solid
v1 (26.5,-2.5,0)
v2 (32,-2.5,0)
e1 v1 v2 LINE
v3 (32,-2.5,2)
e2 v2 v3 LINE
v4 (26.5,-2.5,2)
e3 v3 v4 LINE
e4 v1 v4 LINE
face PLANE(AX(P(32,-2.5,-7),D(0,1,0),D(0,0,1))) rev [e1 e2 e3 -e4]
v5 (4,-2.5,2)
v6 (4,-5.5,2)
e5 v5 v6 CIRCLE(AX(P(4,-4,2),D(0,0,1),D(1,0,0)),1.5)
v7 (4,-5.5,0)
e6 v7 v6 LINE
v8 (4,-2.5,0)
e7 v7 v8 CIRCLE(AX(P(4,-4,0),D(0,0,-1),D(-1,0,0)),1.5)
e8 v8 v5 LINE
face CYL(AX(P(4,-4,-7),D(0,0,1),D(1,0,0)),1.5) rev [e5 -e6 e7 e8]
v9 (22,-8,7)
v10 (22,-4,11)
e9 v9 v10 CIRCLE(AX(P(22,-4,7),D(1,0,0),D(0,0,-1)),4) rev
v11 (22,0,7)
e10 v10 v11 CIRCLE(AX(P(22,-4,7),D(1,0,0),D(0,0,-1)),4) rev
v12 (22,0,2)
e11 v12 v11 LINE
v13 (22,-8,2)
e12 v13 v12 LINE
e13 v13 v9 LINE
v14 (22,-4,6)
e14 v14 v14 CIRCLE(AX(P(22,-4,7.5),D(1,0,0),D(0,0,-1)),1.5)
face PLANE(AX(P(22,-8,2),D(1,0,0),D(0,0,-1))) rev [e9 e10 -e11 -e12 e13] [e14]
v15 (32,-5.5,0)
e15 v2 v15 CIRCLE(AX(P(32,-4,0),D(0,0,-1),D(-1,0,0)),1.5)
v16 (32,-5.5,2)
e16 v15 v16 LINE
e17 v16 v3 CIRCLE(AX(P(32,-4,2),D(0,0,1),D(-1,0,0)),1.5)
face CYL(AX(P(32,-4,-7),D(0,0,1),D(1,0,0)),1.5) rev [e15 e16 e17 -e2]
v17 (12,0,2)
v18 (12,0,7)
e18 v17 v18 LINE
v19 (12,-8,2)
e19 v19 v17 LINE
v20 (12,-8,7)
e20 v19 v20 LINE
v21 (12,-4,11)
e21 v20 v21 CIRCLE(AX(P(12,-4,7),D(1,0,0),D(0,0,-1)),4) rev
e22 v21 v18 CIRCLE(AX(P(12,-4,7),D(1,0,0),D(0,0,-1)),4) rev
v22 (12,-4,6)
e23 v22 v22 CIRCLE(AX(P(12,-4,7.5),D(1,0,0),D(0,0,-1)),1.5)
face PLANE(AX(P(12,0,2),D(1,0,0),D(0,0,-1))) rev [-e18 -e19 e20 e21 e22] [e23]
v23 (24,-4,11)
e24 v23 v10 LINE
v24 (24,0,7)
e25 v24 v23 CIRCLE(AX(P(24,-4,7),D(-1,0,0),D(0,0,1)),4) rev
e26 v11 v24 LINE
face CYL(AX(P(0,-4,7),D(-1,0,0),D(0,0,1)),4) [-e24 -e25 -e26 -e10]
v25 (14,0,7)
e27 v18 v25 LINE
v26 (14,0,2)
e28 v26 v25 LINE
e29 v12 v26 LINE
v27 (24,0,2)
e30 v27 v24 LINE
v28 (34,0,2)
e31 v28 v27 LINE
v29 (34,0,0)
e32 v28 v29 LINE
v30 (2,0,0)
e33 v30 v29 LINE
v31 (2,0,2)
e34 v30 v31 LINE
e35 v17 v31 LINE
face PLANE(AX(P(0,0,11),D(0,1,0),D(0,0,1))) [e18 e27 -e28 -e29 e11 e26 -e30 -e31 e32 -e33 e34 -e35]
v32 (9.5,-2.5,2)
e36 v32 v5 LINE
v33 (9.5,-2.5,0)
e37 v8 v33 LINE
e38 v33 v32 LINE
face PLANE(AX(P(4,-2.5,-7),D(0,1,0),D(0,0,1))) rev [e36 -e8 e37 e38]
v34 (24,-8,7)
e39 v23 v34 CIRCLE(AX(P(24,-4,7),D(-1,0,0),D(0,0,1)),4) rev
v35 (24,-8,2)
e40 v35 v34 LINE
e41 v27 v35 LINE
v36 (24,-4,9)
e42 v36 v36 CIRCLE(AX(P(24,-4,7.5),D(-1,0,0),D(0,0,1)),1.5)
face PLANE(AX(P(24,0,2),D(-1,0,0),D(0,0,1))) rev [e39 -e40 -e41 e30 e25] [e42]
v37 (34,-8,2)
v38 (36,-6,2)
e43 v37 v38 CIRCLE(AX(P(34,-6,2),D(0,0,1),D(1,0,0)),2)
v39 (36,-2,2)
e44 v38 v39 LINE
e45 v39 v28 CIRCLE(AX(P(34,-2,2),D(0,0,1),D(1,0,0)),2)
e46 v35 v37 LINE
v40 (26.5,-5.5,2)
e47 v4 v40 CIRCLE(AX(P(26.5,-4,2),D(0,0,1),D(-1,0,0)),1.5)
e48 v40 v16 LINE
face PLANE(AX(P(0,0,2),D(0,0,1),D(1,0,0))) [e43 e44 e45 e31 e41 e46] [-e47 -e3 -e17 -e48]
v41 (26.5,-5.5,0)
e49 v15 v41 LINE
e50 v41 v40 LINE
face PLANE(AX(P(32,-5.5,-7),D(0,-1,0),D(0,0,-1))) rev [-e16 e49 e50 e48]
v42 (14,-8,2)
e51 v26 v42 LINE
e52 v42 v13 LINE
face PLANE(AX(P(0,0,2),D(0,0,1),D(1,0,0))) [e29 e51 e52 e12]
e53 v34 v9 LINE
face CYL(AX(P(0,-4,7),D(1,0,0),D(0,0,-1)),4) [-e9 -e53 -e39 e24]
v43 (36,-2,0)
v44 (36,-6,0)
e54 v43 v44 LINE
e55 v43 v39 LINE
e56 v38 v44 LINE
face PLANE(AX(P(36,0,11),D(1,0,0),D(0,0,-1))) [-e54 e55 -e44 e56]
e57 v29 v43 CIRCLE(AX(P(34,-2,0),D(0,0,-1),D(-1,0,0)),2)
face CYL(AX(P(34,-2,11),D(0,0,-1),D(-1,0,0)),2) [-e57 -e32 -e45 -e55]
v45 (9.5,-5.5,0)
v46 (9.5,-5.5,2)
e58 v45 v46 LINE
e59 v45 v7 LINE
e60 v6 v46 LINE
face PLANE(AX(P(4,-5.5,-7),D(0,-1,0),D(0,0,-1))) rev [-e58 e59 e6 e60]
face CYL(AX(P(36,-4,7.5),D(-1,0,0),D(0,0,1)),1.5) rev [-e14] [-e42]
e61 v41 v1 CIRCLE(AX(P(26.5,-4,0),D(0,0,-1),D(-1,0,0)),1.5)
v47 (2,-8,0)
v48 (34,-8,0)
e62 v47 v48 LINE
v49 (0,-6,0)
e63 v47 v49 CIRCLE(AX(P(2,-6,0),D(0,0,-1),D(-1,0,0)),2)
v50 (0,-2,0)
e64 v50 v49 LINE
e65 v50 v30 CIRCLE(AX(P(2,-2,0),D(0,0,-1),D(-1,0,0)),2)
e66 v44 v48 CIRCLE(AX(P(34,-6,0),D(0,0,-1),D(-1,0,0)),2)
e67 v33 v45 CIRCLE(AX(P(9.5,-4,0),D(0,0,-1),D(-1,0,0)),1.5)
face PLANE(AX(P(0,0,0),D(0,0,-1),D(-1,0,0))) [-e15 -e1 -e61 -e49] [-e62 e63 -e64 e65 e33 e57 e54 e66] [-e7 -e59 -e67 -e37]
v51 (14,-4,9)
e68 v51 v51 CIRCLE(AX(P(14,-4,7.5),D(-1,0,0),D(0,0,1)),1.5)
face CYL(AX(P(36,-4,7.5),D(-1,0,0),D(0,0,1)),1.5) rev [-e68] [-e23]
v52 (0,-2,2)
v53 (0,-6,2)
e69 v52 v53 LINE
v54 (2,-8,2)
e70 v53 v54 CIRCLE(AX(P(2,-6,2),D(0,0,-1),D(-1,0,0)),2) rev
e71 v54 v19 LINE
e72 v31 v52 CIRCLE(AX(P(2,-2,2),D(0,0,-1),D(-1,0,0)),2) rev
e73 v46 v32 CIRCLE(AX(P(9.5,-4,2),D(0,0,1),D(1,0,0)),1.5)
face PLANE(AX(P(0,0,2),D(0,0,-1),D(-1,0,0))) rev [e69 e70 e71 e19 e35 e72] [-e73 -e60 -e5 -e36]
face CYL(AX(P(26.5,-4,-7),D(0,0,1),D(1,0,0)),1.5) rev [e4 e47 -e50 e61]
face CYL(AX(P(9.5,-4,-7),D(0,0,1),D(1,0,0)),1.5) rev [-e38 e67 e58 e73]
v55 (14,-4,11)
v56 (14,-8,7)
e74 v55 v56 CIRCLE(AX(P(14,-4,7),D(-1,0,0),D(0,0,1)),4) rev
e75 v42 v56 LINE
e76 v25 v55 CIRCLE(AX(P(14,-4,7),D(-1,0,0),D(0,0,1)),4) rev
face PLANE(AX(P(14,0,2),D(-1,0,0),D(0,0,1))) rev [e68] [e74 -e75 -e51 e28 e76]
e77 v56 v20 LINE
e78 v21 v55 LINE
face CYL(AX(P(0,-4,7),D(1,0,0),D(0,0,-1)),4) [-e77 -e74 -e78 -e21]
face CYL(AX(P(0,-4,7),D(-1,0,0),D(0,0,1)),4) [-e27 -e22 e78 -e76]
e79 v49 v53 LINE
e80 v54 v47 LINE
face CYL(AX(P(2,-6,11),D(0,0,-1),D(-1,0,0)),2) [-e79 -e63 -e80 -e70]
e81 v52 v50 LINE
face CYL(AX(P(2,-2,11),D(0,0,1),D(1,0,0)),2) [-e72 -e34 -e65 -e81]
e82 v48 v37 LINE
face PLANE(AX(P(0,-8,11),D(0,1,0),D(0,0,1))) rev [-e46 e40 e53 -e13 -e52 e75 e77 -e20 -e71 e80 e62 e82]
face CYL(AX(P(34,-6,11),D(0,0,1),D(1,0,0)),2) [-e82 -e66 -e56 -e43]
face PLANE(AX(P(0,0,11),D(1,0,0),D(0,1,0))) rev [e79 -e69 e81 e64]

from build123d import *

# Parameters (mm, degrees)
SKETCH_1_W               = 36
SKETCH_1_H               = 8
EXTRUDE_1_DEPTH          = 11
SKETCH_2_W               = 8
SKETCH_2_H               = 8
SKETCH_2_W_2             = 12
CUT_EXTRUDE_1_DEPTH      = 9
FILLET_1_R               = 4
CUT_EXTRUDE_2_DEPTH      = 28.586228448
CUT_EXTRUDE_2_DEPTH_BACK = 28.586228448
SKETCH_3_R               = 1.5
FILLET_2_R               = 2
CUT_EXTRUDE_3_DEPTH      = 9


with BuildPart() as part:
    # 草图1 → 凸台-拉伸1 (new body)
    with BuildSketch(Plane.XY):
        with Locations((18, -4)):
            Rectangle(SKETCH_1_W, SKETCH_1_H)
    extrude(amount=EXTRUDE_1_DEPTH)

    # 草图2 → 切除-拉伸1 (cut)
    with BuildSketch(Plane.XY.offset(11)):
        with Locations((18, -4)):
            Rectangle(SKETCH_2_W, SKETCH_2_H)
        with Locations((6, -4)):
            Rectangle(SKETCH_2_W_2, SKETCH_2_H)
        with Locations((30, -4)):
            Rectangle(SKETCH_2_W_2, SKETCH_2_H)
    extrude(amount=-CUT_EXTRUDE_1_DEPTH, mode=Mode.SUBTRACT)

    # 圆角1
    fillet_1_edges = [part.edges().sort_by_distance(p)[0] for p in [
        (23, -8, 11),
        (23, 0, 11),
        (13, 0, 11),
        (13, -8, 11),
    ]]
    fillet(fillet_1_edges, radius=FILLET_1_R - 0.0001)  # a hair under: the kernel refuses the full size

    # 草图3 → 切除-拉伸2 (cut, two sides: drawn at the far end of the back side and taken through both)
    with BuildSketch(Plane.ZY.offset(-12).offset(-CUT_EXTRUDE_2_DEPTH_BACK)):
        with Locations((7.5, -4)):
            Circle(SKETCH_3_R)
    extrude(amount=CUT_EXTRUDE_2_DEPTH + CUT_EXTRUDE_2_DEPTH_BACK, mode=Mode.SUBTRACT)

    # 圆角2
    fillet_2_edges = [part.edges().sort_by_distance(p)[0] for p in [
        (0, -8, 1),
        (0, 0, 1),
        (36, 0, 1),
        (36, -8, 1),
    ]]
    fillet(fillet_2_edges, radius=FILLET_2_R)

    # 草图4 → 切除-拉伸3 (cut)
    with BuildSketch(Plane.XY.offset(2)):
        with BuildLine():
            Line((32, -2.5), (26.5, -2.5))
            ThreePointArc((26.5, -2.5), (25, -4), (26.5, -5.5))
            Line((26.5, -5.5), (32, -5.5))
            ThreePointArc((32, -5.5), (33.5, -4), (32, -2.5))
        make_face()
        with BuildLine():
            Line((4, -2.5), (9.5, -2.5))
            ThreePointArc((9.5, -2.5), (11, -4), (9.5, -5.5))
            Line((9.5, -5.5), (4, -5.5))
            ThreePointArc((4, -5.5), (2.5, -4), (4, -2.5))
        make_face()
    extrude(amount=-CUT_EXTRUDE_3_DEPTH, mode=Mode.SUBTRACT)


solid = part.part
